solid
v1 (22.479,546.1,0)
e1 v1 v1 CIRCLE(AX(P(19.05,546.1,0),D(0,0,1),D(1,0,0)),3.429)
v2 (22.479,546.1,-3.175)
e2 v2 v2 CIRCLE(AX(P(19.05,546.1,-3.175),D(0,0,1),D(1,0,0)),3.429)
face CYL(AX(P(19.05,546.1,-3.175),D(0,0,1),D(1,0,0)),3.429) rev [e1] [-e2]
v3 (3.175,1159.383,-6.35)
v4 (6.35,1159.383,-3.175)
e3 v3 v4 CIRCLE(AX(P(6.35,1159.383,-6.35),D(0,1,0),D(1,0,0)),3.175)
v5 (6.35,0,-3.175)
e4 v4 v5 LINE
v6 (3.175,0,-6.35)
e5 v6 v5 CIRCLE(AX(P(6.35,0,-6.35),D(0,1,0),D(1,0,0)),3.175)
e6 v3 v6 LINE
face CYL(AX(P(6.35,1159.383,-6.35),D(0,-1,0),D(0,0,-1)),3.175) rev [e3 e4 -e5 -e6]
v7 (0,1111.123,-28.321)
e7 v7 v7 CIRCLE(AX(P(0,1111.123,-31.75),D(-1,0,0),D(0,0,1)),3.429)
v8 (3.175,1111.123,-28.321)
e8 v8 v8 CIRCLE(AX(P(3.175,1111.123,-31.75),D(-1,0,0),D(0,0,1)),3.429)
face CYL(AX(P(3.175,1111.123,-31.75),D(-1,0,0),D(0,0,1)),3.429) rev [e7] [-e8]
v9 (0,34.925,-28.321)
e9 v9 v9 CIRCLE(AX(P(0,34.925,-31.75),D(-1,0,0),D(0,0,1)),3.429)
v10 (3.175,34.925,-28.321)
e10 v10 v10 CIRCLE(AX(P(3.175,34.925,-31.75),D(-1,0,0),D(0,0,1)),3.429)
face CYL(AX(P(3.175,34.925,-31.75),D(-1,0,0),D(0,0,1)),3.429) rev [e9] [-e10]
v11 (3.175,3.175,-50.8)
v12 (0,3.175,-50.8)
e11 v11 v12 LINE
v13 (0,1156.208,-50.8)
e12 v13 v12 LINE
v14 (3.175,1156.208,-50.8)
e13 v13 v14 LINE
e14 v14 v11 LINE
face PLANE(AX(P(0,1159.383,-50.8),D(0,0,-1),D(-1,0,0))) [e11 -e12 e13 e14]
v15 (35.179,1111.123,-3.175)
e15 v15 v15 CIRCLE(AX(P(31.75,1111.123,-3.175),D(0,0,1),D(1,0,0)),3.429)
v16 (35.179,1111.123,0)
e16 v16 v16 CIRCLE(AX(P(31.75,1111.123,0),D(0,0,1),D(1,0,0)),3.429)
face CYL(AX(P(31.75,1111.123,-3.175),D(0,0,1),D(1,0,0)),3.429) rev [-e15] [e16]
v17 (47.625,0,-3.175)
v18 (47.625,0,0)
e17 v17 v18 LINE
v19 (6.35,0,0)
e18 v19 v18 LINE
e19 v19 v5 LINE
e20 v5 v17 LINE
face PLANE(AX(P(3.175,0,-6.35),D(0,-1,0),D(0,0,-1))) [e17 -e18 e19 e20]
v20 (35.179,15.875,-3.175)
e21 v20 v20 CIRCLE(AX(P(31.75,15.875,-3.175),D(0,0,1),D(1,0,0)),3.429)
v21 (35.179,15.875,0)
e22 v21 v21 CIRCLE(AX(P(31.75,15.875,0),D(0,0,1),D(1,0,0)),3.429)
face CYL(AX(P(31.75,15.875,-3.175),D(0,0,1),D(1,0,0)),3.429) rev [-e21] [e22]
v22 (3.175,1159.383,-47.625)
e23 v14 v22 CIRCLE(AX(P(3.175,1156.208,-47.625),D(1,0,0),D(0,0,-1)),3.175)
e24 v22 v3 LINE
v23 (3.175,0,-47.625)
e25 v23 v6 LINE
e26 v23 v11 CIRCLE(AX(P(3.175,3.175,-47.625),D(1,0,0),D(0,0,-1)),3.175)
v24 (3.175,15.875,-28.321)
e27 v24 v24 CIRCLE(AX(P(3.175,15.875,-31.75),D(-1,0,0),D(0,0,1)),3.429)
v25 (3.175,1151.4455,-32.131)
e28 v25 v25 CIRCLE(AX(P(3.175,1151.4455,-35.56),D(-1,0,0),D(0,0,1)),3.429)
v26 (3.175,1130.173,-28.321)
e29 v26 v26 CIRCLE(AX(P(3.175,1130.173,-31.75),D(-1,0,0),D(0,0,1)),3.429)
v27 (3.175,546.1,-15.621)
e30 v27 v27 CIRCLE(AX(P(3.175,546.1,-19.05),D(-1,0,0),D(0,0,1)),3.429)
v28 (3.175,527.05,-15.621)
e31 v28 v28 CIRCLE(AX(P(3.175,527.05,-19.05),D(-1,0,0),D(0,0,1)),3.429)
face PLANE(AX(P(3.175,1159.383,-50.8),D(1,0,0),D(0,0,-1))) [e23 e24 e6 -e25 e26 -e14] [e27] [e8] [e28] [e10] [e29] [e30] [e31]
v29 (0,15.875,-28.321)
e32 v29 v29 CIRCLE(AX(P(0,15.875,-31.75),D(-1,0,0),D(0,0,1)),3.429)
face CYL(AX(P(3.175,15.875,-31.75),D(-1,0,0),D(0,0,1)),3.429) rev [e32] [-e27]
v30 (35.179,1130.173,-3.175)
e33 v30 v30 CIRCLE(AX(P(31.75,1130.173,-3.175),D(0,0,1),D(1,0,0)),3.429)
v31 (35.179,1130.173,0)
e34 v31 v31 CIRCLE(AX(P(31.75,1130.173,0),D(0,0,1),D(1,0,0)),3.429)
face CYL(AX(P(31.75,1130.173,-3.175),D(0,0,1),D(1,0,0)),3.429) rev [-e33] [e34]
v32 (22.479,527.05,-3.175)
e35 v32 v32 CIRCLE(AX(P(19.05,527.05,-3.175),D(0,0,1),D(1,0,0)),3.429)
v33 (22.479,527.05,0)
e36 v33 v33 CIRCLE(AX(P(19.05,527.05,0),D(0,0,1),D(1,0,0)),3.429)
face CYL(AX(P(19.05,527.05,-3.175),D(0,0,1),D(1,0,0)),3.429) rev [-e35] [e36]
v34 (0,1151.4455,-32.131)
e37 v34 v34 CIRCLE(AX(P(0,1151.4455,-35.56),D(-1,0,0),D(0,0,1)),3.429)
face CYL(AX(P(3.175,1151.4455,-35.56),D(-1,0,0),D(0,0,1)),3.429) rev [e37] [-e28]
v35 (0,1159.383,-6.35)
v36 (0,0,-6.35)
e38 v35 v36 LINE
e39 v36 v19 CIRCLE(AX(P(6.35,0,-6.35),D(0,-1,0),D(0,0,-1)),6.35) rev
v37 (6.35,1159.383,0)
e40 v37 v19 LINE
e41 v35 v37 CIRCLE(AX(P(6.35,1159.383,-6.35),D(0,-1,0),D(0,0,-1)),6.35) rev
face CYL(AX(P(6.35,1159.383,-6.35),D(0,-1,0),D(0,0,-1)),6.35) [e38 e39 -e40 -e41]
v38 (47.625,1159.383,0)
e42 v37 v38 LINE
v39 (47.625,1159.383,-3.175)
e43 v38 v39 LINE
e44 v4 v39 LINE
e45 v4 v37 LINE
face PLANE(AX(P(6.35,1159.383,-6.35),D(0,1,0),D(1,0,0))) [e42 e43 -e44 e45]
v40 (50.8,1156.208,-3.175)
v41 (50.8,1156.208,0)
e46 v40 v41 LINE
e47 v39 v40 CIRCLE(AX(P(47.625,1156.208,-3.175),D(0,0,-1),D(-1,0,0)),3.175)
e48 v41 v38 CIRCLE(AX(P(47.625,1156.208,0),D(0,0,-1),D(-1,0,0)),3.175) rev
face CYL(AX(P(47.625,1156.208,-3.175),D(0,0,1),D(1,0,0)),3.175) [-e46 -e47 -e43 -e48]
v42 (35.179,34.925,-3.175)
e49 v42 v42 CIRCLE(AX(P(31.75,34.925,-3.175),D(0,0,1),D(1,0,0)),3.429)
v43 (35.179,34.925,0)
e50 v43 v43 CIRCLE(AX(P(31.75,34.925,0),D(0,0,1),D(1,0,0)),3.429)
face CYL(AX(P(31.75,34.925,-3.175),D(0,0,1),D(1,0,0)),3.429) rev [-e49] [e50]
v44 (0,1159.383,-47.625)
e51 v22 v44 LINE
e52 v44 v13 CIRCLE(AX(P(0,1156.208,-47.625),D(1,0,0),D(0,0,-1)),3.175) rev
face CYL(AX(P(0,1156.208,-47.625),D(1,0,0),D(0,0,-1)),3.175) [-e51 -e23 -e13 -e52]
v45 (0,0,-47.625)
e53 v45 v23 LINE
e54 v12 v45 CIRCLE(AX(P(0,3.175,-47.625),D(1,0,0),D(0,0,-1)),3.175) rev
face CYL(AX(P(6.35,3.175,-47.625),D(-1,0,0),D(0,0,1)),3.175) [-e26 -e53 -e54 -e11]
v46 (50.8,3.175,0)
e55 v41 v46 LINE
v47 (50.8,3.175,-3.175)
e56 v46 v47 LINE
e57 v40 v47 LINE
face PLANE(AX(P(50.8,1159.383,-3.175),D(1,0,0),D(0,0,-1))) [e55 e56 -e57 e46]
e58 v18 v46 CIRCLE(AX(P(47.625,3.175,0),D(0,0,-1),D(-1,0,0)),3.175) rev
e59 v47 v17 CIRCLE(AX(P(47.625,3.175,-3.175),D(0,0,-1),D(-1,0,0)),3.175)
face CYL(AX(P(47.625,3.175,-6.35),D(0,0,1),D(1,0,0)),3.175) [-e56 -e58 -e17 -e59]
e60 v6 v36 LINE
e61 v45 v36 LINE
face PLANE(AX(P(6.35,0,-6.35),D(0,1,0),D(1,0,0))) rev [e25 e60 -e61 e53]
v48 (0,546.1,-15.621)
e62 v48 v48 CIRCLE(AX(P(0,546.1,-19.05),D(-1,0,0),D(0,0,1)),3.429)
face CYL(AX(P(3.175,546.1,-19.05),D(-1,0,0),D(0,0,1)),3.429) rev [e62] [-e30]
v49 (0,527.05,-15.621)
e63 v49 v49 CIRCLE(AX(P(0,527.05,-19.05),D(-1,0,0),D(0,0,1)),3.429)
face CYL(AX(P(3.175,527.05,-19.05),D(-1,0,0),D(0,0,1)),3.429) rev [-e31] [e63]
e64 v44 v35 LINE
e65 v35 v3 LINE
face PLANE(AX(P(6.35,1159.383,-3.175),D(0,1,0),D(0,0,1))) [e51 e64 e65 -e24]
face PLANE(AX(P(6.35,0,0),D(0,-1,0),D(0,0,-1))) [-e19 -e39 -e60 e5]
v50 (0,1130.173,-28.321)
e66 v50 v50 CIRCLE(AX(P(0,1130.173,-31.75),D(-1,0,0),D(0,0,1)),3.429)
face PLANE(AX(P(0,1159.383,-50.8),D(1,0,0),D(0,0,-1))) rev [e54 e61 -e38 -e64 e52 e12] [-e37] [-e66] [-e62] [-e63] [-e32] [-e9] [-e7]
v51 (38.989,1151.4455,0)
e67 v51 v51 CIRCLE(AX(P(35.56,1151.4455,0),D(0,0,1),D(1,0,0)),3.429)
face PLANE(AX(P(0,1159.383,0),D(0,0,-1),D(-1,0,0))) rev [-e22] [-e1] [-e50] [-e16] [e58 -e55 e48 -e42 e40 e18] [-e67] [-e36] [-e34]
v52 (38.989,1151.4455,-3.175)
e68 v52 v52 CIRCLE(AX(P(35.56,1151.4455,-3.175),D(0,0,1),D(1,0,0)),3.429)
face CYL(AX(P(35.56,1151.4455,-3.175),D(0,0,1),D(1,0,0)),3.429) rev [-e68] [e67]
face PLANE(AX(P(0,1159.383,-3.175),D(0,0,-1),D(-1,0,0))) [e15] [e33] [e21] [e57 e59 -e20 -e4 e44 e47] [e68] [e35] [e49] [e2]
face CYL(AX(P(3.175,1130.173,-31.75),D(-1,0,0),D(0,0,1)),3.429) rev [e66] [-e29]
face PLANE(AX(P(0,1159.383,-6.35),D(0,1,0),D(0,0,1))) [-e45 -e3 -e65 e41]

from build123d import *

# Parameters (mm, degrees)
BASE_FLANGE1_DEPTH = 1159.383
SKETCH2_R          = 3.429
CUT_EXTRUDE1_DEPTH = 3.175
SKETCH3_R          = 3.429
CUT_EXTRUDE2_DEPTH = 3.175
FILLET1_R          = 3.175


# Sheet-metal steps are written as plain solids
with BuildPart() as part:
    # Sketch1 → Base-Flange1 (new body)
    with BuildSketch(Plane(origin=(0, 0, 0), x_dir=(1, 0, 0), z_dir=(0, 1, 0))):
        with BuildLine():
            Line((0, 50.8), (0, 6.35))
            ThreePointArc((0, 6.35), (1.859871939, 1.859871939), (6.35, 0))
            Line((6.35, 0), (50.8, 0))
            Line((50.8, 0), (50.8, 3.175))
            Line((50.8, 3.175), (6.35, 3.175))
            ThreePointArc((6.35, 3.175), (4.10493597, 4.10493597), (3.175, 6.35))
            Line((3.175, 6.35), (3.175, 50.8))
            Line((3.175, 50.8), (0, 50.8))
        make_face()
    extrude(amount=BASE_FLANGE1_DEPTH)

    # Sketch2 → Cut-Extrude1 (cut)
    with BuildSketch(Plane.XY):
        with Locations((31.75, 34.925)):
            Circle(SKETCH2_R)
        with Locations((31.75, 15.875)):
            Circle(SKETCH2_R)
        with Locations((19.05, 546.1)):
            Circle(SKETCH2_R)
        with Locations((19.05, 527.05)):
            Circle(SKETCH2_R)
        with Locations((31.75, 1130.173)):
            Circle(SKETCH2_R)
        with Locations((31.75, 1111.123)):
            Circle(SKETCH2_R)
        with Locations((35.56, 1151.4455)):
            Circle(SKETCH2_R)
    extrude(amount=-CUT_EXTRUDE1_DEPTH, mode=Mode.SUBTRACT)

    # Sketch3 → Cut-Extrude2 (cut)
    with BuildSketch(Plane.ZY):
        with Locations((-35.56, 1151.4455)):
            Circle(SKETCH3_R)
        with Locations((-31.75, 34.925)):
            Circle(SKETCH3_R)
        with Locations((-31.75, 15.875)):
            Circle(SKETCH3_R)
        with Locations((-19.05, 546.1)):
            Circle(SKETCH3_R)
        with Locations((-19.05, 527.05)):
            Circle(SKETCH3_R)
        with Locations((-31.75, 1130.173)):
            Circle(SKETCH3_R)
        with Locations((-31.75, 1111.123)):
            Circle(SKETCH3_R)
    extrude(amount=-CUT_EXTRUDE2_DEPTH, mode=Mode.SUBTRACT)

    # Fillet1
    fillet1_edges = [part.edges().sort_by_distance(p)[0] for p in [
        (1.5875, 1159.383, -50.8),
        (1.5875, 0, -50.8),
        (50.8, 1159.383, -1.5875),
        (50.8, 0, -1.5875),
    ]]
    fillet(fillet1_edges, radius=FILLET1_R)


solid = part.part
